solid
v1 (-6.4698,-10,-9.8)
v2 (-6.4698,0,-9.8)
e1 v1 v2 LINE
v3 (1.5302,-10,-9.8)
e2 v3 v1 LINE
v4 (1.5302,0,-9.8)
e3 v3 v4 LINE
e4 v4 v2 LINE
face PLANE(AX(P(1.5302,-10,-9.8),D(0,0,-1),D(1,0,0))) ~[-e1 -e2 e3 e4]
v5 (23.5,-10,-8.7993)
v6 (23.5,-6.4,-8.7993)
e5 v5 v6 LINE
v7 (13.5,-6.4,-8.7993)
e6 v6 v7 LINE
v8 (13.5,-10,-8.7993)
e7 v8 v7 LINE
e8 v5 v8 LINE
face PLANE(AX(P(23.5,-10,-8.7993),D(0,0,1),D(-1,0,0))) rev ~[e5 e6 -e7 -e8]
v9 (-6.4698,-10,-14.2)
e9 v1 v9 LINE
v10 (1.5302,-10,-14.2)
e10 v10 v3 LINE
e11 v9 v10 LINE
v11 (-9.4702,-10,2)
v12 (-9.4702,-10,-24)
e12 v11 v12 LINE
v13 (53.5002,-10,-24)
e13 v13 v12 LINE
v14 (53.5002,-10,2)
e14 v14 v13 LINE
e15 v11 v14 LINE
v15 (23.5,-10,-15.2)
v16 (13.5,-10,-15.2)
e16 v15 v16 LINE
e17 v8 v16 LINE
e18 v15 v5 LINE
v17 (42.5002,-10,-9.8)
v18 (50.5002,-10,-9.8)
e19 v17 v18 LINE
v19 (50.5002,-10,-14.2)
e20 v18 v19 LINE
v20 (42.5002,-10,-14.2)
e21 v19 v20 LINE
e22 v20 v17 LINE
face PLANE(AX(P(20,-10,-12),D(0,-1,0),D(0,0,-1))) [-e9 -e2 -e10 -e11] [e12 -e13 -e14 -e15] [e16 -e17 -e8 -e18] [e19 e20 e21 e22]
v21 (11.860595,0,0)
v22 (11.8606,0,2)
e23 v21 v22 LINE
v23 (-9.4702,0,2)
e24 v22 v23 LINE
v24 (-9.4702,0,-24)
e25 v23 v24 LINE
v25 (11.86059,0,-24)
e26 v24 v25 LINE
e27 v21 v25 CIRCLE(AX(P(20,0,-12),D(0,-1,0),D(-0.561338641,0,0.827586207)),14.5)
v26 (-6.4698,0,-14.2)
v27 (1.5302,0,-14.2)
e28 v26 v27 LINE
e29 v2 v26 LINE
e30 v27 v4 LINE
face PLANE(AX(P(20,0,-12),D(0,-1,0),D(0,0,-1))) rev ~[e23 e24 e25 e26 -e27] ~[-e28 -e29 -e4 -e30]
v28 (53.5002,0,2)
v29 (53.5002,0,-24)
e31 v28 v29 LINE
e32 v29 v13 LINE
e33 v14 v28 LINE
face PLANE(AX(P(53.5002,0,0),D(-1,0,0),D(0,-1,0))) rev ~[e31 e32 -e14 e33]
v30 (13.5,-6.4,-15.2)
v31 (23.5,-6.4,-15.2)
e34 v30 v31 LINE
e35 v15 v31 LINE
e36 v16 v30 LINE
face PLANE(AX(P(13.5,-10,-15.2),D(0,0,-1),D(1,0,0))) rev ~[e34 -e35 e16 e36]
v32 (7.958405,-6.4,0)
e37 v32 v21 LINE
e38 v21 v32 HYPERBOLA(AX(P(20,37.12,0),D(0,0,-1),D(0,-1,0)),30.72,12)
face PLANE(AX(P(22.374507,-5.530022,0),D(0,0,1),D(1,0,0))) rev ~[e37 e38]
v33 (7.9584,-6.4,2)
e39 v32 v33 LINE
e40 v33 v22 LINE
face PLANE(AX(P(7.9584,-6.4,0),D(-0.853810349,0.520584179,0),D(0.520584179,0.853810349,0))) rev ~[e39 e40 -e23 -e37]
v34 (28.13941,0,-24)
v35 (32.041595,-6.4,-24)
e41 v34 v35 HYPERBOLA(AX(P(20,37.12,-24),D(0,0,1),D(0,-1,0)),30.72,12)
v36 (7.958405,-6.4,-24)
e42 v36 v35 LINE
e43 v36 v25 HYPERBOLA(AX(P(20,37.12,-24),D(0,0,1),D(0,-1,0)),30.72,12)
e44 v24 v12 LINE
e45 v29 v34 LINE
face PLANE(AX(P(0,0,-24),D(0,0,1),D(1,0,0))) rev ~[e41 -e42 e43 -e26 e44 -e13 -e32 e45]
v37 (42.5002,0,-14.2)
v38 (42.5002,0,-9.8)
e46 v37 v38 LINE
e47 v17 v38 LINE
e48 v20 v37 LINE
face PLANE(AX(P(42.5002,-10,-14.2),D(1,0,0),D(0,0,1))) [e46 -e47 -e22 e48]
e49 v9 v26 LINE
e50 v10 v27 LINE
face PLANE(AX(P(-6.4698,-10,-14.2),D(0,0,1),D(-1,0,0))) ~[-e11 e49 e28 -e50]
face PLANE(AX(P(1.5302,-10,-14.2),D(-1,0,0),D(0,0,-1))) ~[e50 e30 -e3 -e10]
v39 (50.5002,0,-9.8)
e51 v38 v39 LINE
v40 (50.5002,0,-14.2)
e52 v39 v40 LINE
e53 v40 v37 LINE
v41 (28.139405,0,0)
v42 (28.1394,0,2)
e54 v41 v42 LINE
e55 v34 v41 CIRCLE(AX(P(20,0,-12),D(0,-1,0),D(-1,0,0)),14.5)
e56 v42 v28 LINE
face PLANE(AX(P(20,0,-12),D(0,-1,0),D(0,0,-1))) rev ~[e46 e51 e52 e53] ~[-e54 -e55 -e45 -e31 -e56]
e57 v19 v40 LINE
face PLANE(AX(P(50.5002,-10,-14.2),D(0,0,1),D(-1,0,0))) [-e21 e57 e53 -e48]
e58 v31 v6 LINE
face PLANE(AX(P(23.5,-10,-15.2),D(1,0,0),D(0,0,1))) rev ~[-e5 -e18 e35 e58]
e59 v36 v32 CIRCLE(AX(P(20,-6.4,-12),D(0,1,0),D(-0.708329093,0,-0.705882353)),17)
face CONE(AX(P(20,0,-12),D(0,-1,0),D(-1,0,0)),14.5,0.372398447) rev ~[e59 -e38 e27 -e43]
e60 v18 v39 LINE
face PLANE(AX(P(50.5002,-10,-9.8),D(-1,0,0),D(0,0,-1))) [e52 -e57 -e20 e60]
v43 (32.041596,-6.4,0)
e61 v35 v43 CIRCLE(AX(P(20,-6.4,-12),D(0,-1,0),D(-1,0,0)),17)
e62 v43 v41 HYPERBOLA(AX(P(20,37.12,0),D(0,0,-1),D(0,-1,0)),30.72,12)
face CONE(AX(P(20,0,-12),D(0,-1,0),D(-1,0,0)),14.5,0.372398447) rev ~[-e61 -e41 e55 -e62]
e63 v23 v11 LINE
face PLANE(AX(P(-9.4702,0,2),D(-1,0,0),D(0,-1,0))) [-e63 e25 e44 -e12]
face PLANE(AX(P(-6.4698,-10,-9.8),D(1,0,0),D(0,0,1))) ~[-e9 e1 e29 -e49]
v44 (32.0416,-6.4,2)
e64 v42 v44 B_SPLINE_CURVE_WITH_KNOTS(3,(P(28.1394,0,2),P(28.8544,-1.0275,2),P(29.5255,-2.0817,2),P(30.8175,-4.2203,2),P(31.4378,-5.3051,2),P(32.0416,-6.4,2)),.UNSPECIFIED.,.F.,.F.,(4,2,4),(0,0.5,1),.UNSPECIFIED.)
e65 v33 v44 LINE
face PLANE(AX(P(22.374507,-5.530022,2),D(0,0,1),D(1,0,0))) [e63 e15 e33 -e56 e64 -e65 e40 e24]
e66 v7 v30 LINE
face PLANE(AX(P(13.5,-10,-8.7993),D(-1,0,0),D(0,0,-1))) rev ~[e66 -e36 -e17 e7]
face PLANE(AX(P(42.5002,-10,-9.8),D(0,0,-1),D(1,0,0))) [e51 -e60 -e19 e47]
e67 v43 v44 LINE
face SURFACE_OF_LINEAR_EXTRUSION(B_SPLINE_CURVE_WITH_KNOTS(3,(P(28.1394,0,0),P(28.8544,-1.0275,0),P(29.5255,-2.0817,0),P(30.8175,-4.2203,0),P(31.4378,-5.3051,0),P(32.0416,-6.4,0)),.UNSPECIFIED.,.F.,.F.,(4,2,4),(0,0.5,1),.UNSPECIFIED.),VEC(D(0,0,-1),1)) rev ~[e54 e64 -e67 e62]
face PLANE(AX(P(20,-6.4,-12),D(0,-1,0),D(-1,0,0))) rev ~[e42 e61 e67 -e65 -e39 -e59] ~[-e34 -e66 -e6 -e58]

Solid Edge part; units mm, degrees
sketch "Sketch1" plane through (0, 0, 0) normal (0, -1, 0) x (1, 0, 0)
  line L0 (0, 0) -> (0, -24)
  line L1 (0, -24) -> (40, -24)
  line L2 (40, -24) -> (40, 0)
  line L3 (40, 0) -> (0, 0)
extrude "Protrusion1" add sketch "Sketch1" along normal blind 10
sketch "Sketch2" plane through (20, -10, -12) normal (0, -1, 0) x (1, 0, 0)
  circle A0 centre (-1.5, 0) radius 3.2
  dimension "D1" = 18.5
  dimension "D2" = 12
  dimension "D3" = 6.4
extrude "ExtrudedCutout_1" cut sketch "Sketch2" against normal blind 73.4208
sketch "Sketch3" plane through (20, -5, -12) normal (0, 0, -1) x (-1, 0, 0)
  line L0 (0, 5) -> (14.5, 5)
  line L1 (14.5, 5) -> (17, -1.4)
  line L2 (17, -1.4) -> (0, -1.4)
  dimension "D1" = 5.5
  dimension "D2" = 3.6
  dimension "D3" = 14.5
  dimension "D4" = 17
revolve "RevolvedCutout1" cut sketch "Sketch3" angle 360 about axis through (20, -10, -12) along (0, -1, 0)
sketch "Sketch4" plane through (20, -5, -12) normal (0, 0, -1) x (-1, 0, 0)
  line L0 (-20, 5) -> (-33.5002, 5)
  line L1 (-33.5002, 5) -> (-33.5002, -5)
  line L2 (-33.5002, -5) -> (-20, -5)
  line L3 (-20, -5) -> (-20, 5)
  line L4 (20, 5) -> (20, -5)
  line L5 (20, -5) -> (28, -5)
  line L6 (28, -5) -> (28, 5)
  line L7 (28, 5) -> (20, 5)
  dimension "D1" = 8
extrude "Protrusion2" add sketch "Sketch4" along normal up to surface (24 mm away) from surface at -12
sketch "Sketch5" plane through (22.7501, -5, 0) normal (0, 0, 1) x (-1, 0, 0)
  spline S0 degree 3 poles (-5.3893, -5) (-6.1043, -3.9725) (-6.7754, -2.9183) (-8.0674, -0.7797) (-8.6877, 0.3051) (-9.2915, 1.4) knots 0 0 0 0 0.5 0.5 1 1 1 1
  line L0 (-9.2915, 1.4) -> (-4.8846, 1.4)
  line L1 (-4.8846, 1.4) -> (10.7035, 1.4)
  line L2 (10.7035, 1.4) -> (14.7917, 1.4)
  line L3 (14.7917, 1.4) -> (10.8895, -5)
  line L4 (10.8895, -5) -> (30.7501, -5)
  line L5 (30.7501, -5) -> (30.7501, 5)
  line L6 (30.7501, 5) -> (-30.7501, 5)
  line L7 (-30.7501, 5) -> (-30.7501, -5)
  line L8 (-5.3893, -5) -> (-30.7501, -5)
extrude "Protrusion3" add sketch "Sketch5" along normal up to vertex (2 mm away)
sketch "Sketch6" plane through (22.7501, -5, 2) normal (0, 0, 1) x (-1, 0, 0)
  line L0 (32.2203, -5) -> (30.7501, -5)
  line L1 (30.7501, 5) -> (30.7501, -5)
  line L2 (32.2203, 5) -> (30.7501, 5)
  line L3 (32.2203, -5) -> (32.2203, 5)
extrude "Protrusion4" add sketch "Sketch6" against normal up to vertex (26 mm away)
sketch "Sketch7" plane through (22.015, -10, -11) normal (0, -1, 0) x (-1, 0, 0)
  line L0 (-28.4852, 3.2) -> (-20.4852, 3.2)
  line L1 (-20.4852, 3.2) -> (-20.4852, -1.2)
  line L2 (-20.4852, -1.2) -> (-28.4852, -1.2)
  line L3 (-28.4852, -1.2) -> (-28.4852, 3.2)
  dimension "D1" = 8
  dimension "D2" = 4.4
  dimension "D3" = 3
extrude "ExtrudedCutout_3" cut sketch "Sketch7" against normal blind 37.6385
mirror "Mirror1" about plane through (22.0152, -5, -11) normal (1, 0, 0) of "ExtrudedCutout_3"
sketch "Sketch8" plane through (22.015, -10, -11) normal (0, -1, 0) x (-1, 0, 0)
  line L0 (-1.485, 4.2) -> (-1.485, -2.2007)
  line L1 (-1.485, -2.2007) -> (8.515, -2.2007)
  line L2 (8.515, -2.2007) -> (8.515, 4.2)
  line L3 (8.515, 4.2) -> (-1.485, 4.2)
  dimension "D1" = 6.4007
  dimension "D2" = 10
  dimension "D3" = 1.8
extrude "ExtrudedCutout_4" cut sketch "Sketch8" against normal blind 87.6344
